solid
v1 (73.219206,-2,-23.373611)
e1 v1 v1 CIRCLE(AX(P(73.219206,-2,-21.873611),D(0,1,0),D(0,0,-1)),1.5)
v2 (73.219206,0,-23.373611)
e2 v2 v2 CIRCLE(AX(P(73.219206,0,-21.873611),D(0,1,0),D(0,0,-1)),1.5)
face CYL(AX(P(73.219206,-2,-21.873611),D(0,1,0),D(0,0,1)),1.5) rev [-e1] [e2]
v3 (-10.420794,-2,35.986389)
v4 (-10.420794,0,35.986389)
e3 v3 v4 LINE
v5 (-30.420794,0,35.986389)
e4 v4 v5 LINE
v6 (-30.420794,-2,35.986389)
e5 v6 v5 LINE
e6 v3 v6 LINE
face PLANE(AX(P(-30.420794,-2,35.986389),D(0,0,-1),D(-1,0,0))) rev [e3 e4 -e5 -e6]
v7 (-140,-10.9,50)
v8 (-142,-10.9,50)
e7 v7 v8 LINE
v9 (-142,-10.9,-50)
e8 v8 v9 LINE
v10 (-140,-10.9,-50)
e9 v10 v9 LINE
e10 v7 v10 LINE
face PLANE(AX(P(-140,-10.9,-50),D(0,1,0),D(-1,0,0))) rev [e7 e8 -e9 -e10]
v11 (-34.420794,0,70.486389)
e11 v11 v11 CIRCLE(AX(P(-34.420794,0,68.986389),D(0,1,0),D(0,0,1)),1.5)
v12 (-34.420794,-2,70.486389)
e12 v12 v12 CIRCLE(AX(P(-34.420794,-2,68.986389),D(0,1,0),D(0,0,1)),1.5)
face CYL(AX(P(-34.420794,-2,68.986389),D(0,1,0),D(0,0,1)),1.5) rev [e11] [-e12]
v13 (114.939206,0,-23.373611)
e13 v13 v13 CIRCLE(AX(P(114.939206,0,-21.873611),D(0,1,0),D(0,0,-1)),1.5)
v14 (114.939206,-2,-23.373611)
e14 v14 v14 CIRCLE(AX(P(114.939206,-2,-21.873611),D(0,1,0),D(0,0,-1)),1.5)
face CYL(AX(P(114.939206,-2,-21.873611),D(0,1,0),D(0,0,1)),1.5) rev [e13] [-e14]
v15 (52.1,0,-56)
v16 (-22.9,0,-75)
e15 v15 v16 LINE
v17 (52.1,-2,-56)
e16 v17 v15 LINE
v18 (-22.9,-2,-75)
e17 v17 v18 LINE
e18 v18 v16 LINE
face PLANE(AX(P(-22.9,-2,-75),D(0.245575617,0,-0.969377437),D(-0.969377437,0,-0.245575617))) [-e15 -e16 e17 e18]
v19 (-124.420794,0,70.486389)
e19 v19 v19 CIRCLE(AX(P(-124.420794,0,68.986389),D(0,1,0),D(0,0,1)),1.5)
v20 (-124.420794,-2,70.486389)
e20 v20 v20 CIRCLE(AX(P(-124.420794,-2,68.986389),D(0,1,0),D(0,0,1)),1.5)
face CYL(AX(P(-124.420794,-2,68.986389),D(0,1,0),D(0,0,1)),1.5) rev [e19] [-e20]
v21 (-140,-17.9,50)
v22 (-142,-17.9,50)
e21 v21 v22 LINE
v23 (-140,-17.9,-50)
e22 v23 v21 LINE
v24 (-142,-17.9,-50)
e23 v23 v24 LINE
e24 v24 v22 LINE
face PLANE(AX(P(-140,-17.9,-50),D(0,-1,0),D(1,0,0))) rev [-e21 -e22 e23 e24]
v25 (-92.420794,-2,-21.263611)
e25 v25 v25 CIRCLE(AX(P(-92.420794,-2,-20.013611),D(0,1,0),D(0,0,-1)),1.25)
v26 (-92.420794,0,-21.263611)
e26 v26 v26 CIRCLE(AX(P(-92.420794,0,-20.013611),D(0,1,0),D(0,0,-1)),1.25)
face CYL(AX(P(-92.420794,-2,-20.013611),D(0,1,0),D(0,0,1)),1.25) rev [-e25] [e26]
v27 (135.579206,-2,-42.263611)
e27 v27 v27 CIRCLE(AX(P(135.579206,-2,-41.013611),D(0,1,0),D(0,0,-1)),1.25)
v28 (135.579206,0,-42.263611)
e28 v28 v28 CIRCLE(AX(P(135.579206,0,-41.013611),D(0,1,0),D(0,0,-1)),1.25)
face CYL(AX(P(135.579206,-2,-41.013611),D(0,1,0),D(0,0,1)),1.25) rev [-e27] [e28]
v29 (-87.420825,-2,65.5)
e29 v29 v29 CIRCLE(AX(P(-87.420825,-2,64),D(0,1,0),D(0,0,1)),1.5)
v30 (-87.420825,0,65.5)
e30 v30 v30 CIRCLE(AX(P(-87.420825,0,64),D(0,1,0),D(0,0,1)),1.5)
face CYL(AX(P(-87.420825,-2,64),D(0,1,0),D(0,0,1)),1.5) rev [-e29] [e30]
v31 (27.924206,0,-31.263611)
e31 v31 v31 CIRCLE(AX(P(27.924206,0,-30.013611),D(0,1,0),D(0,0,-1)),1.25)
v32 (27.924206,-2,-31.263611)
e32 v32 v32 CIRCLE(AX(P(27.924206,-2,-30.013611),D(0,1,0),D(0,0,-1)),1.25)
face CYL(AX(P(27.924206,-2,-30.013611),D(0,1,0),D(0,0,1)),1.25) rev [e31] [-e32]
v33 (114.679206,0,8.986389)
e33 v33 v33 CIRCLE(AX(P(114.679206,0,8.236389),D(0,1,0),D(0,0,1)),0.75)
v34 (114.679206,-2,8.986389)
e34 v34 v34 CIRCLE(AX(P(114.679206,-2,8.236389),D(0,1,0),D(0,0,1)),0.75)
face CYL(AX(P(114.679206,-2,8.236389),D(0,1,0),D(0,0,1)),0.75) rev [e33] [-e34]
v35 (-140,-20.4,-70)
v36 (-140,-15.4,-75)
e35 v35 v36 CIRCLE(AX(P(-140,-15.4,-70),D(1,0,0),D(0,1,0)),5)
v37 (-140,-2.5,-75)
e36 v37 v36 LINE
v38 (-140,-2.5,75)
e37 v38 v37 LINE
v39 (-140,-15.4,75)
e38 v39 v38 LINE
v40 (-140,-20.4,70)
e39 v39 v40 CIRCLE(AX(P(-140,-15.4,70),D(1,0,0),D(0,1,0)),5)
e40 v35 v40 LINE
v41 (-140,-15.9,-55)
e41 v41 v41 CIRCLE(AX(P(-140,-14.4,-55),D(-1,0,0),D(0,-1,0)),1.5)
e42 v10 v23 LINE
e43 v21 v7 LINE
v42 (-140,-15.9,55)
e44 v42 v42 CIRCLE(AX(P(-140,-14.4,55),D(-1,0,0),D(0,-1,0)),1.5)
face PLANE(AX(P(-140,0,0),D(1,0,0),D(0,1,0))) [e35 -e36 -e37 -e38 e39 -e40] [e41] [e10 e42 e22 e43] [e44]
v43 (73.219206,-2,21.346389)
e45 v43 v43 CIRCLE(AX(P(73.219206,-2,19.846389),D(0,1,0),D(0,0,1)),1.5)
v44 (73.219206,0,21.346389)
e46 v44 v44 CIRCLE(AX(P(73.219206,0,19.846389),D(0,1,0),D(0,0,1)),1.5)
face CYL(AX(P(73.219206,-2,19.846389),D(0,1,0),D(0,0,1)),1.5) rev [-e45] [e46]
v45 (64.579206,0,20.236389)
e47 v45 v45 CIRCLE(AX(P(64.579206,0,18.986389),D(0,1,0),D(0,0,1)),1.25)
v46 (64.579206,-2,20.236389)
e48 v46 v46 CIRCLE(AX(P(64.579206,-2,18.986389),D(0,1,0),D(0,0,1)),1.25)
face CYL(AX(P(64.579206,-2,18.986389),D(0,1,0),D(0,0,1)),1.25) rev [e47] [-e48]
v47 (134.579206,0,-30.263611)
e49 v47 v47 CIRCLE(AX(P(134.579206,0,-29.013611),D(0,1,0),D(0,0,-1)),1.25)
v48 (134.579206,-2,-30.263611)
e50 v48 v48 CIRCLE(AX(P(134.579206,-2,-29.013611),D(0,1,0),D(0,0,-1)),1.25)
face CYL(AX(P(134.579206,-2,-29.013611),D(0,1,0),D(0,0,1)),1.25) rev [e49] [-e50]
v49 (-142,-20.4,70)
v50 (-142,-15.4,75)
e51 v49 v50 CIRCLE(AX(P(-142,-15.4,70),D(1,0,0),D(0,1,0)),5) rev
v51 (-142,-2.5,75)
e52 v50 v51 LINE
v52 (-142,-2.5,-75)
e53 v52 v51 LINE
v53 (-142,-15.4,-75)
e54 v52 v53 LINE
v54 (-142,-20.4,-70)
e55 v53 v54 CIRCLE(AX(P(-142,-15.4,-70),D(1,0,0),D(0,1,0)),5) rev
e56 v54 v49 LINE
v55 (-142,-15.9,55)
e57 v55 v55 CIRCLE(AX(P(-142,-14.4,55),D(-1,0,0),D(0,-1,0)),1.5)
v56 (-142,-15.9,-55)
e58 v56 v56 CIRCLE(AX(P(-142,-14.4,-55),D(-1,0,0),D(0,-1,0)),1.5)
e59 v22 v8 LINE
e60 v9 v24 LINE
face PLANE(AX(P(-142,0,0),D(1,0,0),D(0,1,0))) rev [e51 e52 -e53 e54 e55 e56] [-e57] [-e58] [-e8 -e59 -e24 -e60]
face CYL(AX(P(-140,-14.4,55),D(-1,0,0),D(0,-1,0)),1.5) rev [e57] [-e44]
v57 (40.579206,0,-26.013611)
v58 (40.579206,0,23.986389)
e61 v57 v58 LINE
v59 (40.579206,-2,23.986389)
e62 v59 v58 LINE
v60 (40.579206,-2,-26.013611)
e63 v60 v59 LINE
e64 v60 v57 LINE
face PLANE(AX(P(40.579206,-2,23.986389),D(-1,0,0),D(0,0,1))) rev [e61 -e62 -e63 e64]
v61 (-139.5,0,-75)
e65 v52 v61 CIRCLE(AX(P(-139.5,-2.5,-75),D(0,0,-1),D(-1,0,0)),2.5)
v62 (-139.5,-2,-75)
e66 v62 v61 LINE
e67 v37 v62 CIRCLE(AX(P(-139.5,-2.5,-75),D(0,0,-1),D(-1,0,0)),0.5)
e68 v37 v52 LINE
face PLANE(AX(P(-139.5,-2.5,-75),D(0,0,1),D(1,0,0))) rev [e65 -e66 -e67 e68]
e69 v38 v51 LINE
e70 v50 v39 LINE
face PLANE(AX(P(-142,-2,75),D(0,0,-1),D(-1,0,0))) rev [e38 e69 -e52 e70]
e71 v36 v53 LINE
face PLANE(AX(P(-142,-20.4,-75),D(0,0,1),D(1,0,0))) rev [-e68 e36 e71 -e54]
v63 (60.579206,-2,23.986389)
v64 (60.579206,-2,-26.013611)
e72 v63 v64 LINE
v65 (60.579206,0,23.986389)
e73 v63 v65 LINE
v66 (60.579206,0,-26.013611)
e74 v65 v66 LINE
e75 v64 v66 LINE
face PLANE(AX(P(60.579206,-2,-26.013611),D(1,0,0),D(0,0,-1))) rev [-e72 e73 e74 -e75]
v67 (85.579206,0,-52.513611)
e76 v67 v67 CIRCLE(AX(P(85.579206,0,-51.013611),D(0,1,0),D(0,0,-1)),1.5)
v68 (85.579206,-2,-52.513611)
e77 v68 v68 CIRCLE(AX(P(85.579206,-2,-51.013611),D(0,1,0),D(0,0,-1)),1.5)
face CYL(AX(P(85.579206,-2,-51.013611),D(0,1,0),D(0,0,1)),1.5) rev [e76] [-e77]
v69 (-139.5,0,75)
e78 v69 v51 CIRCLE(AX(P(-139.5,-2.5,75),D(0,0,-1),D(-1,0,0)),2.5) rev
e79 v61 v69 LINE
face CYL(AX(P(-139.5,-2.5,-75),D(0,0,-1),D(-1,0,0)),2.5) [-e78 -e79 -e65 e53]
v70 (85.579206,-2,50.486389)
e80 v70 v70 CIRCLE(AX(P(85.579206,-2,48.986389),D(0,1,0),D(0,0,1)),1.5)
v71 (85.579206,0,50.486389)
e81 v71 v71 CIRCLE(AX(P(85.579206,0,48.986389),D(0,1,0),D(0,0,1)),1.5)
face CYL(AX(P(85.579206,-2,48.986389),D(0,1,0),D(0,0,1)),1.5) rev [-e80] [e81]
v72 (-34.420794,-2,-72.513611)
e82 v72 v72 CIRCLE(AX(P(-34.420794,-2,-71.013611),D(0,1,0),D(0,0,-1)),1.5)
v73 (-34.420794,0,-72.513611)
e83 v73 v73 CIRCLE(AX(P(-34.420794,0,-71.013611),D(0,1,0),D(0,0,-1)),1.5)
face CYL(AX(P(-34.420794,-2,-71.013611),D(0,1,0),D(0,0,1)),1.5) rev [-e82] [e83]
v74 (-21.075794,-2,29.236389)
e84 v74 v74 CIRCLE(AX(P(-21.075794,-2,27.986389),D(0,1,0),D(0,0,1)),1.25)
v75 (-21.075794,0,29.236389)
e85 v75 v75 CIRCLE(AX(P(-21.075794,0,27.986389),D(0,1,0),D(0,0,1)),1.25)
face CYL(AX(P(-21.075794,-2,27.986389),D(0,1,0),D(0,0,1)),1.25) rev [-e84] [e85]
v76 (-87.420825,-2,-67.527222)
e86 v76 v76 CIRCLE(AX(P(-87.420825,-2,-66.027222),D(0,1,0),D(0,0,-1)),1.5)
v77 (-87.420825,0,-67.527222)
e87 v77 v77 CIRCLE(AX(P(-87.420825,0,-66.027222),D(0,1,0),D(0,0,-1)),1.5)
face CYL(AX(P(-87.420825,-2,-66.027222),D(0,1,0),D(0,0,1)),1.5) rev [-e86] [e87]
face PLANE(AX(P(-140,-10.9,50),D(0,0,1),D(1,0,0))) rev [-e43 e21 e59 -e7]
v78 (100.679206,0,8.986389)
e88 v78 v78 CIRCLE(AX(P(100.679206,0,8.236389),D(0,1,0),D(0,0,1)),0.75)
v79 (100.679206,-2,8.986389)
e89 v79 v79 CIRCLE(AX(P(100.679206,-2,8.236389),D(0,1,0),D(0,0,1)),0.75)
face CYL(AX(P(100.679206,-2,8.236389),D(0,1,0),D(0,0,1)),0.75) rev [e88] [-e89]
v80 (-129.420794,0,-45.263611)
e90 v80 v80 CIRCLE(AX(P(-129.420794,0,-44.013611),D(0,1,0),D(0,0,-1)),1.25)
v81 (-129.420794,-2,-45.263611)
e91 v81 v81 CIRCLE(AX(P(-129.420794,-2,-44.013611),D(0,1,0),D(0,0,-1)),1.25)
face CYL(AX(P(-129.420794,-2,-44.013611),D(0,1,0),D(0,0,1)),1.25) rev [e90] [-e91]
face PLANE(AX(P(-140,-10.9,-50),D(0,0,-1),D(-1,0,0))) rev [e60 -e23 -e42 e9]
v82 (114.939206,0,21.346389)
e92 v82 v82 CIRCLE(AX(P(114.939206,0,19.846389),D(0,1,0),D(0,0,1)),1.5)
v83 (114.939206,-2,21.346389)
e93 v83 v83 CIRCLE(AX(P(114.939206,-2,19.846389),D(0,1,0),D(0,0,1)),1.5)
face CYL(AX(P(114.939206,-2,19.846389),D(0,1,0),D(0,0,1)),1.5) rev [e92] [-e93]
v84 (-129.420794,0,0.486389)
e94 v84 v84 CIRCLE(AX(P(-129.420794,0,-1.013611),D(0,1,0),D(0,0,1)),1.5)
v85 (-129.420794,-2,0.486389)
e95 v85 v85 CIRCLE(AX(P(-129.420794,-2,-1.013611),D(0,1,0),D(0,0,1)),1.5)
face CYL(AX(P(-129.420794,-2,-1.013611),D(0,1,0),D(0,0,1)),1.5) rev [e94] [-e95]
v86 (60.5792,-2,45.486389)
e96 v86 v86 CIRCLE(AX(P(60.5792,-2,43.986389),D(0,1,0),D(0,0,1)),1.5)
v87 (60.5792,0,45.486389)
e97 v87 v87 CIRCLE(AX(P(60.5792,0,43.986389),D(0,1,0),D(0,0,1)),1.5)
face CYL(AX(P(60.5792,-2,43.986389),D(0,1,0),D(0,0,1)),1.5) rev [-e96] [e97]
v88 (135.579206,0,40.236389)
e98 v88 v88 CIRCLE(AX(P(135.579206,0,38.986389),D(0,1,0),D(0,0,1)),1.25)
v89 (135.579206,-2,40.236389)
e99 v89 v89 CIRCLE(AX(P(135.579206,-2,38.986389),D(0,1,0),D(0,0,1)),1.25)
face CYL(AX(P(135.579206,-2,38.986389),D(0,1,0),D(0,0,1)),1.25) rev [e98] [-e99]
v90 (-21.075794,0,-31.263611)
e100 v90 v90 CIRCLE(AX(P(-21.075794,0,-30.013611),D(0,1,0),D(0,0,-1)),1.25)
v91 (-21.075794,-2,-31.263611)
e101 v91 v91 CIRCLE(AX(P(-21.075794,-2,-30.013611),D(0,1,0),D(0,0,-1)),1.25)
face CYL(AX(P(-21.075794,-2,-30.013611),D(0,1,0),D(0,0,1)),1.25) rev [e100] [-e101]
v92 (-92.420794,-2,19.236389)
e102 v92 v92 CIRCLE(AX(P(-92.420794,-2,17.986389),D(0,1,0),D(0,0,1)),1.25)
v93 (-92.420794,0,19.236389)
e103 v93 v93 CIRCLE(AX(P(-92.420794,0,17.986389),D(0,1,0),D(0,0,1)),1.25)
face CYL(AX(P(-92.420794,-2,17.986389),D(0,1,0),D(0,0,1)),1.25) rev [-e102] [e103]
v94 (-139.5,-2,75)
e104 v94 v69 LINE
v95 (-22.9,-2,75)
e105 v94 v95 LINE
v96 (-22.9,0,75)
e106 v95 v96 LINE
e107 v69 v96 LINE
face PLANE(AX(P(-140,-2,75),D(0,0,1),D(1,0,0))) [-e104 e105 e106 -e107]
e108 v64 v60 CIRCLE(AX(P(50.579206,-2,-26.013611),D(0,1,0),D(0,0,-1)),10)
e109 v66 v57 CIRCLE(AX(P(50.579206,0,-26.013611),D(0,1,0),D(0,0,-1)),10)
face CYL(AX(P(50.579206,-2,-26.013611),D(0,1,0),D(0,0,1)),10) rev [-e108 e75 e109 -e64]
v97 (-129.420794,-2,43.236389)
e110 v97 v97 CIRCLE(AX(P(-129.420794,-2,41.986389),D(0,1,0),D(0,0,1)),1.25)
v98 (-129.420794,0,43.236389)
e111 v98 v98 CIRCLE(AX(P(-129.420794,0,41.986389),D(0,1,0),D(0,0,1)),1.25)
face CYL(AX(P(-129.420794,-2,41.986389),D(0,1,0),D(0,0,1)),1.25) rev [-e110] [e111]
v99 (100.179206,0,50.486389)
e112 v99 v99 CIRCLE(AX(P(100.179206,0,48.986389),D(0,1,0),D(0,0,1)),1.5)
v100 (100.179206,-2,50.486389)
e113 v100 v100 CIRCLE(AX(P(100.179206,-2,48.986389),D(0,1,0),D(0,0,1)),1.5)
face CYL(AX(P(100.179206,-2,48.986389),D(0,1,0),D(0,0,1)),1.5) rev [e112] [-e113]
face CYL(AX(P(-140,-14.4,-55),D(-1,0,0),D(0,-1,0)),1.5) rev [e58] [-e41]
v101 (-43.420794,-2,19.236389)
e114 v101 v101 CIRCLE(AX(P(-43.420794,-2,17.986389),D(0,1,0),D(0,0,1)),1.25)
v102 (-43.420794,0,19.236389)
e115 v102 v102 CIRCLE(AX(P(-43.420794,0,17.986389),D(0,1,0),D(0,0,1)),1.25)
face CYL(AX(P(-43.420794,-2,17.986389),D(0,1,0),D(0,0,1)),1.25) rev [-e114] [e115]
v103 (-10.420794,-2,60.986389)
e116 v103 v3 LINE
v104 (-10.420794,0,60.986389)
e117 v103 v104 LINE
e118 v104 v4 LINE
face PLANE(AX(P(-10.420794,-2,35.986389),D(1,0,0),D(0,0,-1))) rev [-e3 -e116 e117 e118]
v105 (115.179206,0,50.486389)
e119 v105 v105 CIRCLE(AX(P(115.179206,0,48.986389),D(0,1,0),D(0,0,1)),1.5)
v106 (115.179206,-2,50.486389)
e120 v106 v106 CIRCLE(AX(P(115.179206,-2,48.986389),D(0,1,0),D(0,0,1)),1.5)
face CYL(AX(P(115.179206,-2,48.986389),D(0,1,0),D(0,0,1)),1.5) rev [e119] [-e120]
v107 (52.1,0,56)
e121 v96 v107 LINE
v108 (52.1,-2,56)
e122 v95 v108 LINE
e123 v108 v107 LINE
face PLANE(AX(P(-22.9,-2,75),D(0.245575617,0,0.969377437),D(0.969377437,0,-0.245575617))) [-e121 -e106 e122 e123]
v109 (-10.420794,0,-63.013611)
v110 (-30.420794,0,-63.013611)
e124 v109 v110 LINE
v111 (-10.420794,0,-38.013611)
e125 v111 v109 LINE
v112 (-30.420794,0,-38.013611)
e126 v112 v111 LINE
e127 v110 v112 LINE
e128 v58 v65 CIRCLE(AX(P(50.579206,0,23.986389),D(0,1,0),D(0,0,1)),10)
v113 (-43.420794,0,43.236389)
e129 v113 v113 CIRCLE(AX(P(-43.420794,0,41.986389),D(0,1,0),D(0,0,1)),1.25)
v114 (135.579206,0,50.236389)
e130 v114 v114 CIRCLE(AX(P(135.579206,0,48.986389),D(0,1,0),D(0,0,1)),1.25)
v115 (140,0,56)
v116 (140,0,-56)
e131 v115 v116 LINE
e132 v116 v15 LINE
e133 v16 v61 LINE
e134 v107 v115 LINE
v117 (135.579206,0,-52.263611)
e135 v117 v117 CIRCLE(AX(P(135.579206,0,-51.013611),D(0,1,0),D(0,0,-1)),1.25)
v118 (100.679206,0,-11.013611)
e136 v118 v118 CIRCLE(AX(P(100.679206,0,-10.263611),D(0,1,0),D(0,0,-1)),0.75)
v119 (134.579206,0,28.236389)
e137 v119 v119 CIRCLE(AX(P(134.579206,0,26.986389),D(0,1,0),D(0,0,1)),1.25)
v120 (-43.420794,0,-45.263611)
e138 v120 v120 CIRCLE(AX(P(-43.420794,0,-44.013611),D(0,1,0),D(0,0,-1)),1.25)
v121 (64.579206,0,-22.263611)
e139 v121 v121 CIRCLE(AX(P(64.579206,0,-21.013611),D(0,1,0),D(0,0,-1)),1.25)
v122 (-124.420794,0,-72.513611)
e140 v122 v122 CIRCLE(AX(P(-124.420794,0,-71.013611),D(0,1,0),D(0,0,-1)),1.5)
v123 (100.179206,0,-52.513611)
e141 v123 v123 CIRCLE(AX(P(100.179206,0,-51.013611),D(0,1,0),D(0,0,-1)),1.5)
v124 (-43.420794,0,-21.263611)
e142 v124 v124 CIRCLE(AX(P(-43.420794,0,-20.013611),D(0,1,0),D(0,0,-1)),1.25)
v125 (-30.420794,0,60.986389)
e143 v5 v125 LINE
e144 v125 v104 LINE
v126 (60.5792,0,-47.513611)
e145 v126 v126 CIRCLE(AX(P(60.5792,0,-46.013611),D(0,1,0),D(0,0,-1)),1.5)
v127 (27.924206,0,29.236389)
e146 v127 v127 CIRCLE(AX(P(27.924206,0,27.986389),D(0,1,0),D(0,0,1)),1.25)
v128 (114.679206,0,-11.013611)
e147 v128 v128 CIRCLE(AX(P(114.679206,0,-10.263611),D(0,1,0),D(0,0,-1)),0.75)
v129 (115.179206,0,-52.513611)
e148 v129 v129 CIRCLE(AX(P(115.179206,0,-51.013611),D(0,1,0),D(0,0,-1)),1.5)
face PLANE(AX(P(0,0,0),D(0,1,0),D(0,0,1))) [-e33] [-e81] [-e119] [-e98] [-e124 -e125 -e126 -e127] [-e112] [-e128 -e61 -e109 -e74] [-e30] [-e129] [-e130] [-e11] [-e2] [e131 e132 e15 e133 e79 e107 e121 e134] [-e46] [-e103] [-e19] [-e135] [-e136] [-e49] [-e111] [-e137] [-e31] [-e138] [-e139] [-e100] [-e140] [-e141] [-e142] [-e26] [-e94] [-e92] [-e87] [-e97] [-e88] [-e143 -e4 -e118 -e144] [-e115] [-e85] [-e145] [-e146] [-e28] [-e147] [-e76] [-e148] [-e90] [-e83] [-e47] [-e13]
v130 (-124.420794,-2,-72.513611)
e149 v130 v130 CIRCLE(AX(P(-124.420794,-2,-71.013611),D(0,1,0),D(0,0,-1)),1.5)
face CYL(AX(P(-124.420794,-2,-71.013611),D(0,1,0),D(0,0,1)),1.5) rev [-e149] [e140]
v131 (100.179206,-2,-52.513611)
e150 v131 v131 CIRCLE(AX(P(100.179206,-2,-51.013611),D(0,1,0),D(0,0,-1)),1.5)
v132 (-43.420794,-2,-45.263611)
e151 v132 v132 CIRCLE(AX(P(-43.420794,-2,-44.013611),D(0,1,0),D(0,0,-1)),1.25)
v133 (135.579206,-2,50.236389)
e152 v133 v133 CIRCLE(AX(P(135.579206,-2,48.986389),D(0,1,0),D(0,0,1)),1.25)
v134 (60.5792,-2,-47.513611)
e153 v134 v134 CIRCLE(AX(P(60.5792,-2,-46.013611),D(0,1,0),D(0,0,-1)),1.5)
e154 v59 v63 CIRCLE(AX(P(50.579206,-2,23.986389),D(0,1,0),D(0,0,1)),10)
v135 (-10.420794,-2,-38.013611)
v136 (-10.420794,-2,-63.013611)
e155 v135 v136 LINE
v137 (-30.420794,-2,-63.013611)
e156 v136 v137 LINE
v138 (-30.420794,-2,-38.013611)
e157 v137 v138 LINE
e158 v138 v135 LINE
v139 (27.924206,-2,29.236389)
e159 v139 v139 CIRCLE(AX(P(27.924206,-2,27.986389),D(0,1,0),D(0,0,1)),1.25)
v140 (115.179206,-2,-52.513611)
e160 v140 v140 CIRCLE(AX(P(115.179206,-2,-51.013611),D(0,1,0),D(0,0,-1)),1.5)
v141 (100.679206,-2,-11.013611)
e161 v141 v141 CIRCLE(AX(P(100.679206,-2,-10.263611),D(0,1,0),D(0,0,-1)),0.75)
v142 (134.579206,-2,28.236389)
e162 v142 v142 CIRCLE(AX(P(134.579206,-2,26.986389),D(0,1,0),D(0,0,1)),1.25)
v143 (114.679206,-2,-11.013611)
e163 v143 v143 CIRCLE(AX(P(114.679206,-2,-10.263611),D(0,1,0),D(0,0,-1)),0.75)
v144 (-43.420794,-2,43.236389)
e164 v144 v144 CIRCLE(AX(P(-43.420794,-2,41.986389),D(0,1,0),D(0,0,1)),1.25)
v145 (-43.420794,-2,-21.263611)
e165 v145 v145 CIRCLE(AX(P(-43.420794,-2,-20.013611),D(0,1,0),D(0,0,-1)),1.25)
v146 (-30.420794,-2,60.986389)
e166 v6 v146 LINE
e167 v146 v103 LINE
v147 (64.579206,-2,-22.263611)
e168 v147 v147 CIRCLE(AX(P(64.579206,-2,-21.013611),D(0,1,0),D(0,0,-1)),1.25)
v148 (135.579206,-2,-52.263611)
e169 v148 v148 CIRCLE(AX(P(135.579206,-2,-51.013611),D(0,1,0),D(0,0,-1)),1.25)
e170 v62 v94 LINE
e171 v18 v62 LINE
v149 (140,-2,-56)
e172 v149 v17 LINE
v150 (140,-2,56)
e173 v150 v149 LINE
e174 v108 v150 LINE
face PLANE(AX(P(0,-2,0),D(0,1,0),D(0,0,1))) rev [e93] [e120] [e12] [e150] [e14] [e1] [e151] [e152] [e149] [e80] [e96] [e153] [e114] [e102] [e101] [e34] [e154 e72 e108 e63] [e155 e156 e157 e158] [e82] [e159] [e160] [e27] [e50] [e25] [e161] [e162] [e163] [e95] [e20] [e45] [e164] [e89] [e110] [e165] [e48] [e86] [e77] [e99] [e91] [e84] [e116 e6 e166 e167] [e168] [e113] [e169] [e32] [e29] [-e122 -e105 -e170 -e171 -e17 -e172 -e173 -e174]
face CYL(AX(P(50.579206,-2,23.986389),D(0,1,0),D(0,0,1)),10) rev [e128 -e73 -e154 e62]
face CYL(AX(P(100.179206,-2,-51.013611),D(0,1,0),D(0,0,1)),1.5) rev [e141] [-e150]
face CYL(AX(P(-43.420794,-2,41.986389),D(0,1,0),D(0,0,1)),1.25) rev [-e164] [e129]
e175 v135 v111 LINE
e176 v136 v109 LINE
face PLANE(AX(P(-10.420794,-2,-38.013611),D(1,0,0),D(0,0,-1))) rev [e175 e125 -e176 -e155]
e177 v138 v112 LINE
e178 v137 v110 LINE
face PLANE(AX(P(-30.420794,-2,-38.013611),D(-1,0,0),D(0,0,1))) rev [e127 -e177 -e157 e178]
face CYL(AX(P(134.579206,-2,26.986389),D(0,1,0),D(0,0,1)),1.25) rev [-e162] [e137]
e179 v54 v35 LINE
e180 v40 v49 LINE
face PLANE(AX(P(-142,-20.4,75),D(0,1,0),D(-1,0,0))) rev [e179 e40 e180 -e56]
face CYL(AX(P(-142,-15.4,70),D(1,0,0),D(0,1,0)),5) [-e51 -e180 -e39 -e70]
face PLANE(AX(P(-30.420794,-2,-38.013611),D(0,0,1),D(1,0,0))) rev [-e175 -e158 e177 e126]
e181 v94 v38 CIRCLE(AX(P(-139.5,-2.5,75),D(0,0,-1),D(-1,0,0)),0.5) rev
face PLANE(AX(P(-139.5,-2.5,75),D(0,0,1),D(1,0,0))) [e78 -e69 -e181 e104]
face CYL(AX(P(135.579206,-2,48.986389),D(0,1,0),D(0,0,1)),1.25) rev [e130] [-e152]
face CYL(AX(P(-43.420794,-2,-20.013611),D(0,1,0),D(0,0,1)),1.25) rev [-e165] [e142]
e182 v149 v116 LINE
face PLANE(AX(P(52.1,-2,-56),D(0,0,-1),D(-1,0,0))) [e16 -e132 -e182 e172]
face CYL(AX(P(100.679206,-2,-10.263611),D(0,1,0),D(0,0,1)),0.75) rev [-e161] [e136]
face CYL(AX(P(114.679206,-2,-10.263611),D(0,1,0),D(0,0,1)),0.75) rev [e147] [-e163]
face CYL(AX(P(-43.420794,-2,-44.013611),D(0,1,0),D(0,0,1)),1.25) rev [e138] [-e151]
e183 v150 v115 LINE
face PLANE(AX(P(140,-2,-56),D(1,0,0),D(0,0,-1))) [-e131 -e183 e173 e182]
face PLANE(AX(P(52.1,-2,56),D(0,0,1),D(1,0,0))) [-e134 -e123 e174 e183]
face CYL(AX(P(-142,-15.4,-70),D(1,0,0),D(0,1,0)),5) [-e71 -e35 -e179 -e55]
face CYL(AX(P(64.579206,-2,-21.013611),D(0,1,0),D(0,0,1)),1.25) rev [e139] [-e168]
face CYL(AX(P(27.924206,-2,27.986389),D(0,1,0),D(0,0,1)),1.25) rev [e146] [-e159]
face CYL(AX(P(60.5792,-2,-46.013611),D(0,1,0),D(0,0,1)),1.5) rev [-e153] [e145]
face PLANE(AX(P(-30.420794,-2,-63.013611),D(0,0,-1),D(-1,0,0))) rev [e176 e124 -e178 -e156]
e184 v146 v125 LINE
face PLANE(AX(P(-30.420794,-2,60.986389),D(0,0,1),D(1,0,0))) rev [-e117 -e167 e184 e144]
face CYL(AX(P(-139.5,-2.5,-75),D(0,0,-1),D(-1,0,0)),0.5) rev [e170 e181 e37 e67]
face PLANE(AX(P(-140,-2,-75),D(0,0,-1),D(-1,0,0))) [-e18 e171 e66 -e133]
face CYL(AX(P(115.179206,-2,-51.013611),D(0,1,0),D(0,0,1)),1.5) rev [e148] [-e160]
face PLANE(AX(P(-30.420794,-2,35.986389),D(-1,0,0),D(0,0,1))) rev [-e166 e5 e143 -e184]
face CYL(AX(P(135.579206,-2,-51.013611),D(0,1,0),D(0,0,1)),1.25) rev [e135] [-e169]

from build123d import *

# Parameters (mm, degrees)
BRIDA_BASE1_DEPTH                = 2
CROQUIS9_R                       = 1.5
CROQUIS9_R_2                     = 1.25
CROQUIS9_R_3                     = 0.75
CROQUIS9_W                       = 20
CROQUIS9_H                       = 25
CORTAR_EXTRUIR2_DEPTH            = 159.836393815
BRIDA_DE_ARISTA1_STRIP_W         = 9
BRIDA_DE_ARISTA1_STRIP_H         = 2
BRIDA_DE_ARISTA1_STRIP_CUT_DEPTH = 150
BRIDA_DE_ARISTA1_DEPTH           = 150
CROQUIS13_R                      = 1.5
CROQUIS13_W                      = 100
CROQUIS13_H                      = 7
CORTAR_EXTRUIR3_DEPTH            = 10
REDONDEO2_R                      = 5


# Sheet-metal steps are written as plain solids
with BuildPart() as part:
    # Croquis base → Brida base1 (new body)
    with BuildSketch(Plane(origin=(0, 0, 0), x_dir=(1, 0, 0), z_dir=(0, 1, 0))):
        Polygon((-140, 75), (-22.9, 75), (52.1, 56), (140, 56), (140, -56), (52.1, -56), (-22.9, -75), (-140, -75), align=None)
    extrude(amount=-BRIDA_BASE1_DEPTH)

    # Croquis9 → Cortar-Extruir2 (cut, through all)
    with BuildSketch(Plane(origin=(0, 0, 0), x_dir=(1, 0, 0), z_dir=(0, 1, 0))):
        with Locations(Location((85.579206262, -48.986389042, 0), (0, 0, 270))):
            Circle(CROQUIS9_R)
        with Locations(Location((100.179206262, -48.986389042, 0), (0, 0, 270))):
            Circle(CROQUIS9_R)
        with Locations(Location((115.179206262, -48.986389042, 0), (0, 0, 270))):
            Circle(CROQUIS9_R)
        with Locations(Location((135.579206262, -48.986389042, 0), (0, 0, 270))):
            Circle(CROQUIS9_R_2)
        with Locations(Location((-124.420793738, -68.986389042, 0), (0, 0, 270))):
            Circle(CROQUIS9_R)
        with Locations(Location((-34.420793738, -68.986389042, 0), (0, 0, 270))):
            Circle(CROQUIS9_R)
        with Locations(Location((-87.420825, -64, 0), (0, 0, 270))):
            Circle(CROQUIS9_R)
        with Locations(Location((-129.420793738, -41.986389042, 0), (0, 0, 270))):
            Circle(CROQUIS9_R_2)
        with Locations(Location((-43.420793738, -41.986389042, 0), (0, 0, 270))):
            Circle(CROQUIS9_R_2)
        with Locations(Location((60.5792, -43.986389042, 0), (0, 0, 270))):
            Circle(CROQUIS9_R)
        with Locations(Location((135.579206262, -38.986389042, 0), (0, 0, 270))):
            Circle(CROQUIS9_R_2)
        with Locations(Location((134.579206262, -26.986389042, 0), (0, 0, 270))):
            Circle(CROQUIS9_R_2)
        with Locations(Location((-92.420793738, -17.986389042, 0), (0, 0, 270))):
            Circle(CROQUIS9_R_2)
        with Locations(Location((-43.420793738, -17.986389042, 0), (0, 0, 270))):
            Circle(CROQUIS9_R_2)
        with Locations(Location((-21.075793738, -27.986389042, 0), (0, 0, 270))):
            Circle(CROQUIS9_R_2)
        with Locations(Location((27.924206262, -27.986389042, 0), (0, 0, 270))):
            Circle(CROQUIS9_R_2)
        with Locations(Location((64.579206262, -18.986389042, 0), (0, 0, 270))):
            Circle(CROQUIS9_R_2)
        with Locations(Location((114.939206262, -19.846389042, 0), (0, 0, 270))):
            Circle(CROQUIS9_R)
        with Locations(Location((73.219206262, -19.846389042, 0), (0, 0, 270))):
            Circle(CROQUIS9_R)
        with Locations(Location((100.679206262, -8.236389042, 0), (0, 0, 270))):
            Circle(CROQUIS9_R_3)
        with Locations(Location((114.679206262, -8.236389042, 0), (0, 0, 270))):
            Circle(CROQUIS9_R_3)
        with Locations(Location((-124.420793738, 71.013610958, 0), (0, 0, 90))):
            Circle(CROQUIS9_R)
        with Locations(Location((-129.420793738, 44.013610958, 0), (0, 0, 90))):
            Circle(CROQUIS9_R_2)
        with Locations(Location((-87.420825, 66.027221915, 0), (0, 0, 90))):
            Circle(CROQUIS9_R)
        with Locations(Location((-92.420793738, 20.013610958, 0), (0, 0, 90))):
            Circle(CROQUIS9_R_2)
        with Locations(Location((-43.420793738, 20.013610958, 0), (0, 0, 90))):
            Circle(CROQUIS9_R_2)
        with Locations(Location((-43.420793738, 44.013610958, 0), (0, 0, 90))):
            Circle(CROQUIS9_R_2)
        with Locations(Location((-34.420793738, 71.013610958, 0), (0, 0, 90))):
            Circle(CROQUIS9_R)
        with Locations(Location((-21.075793738, 30.013610958, 0), (0, 0, 90))):
            Circle(CROQUIS9_R_2)
        with Locations(Location((115.179206262, 51.013610958, 0), (0, 0, 90))):
            Circle(CROQUIS9_R)
        with Locations(Location((27.924206262, 30.013610958, 0), (0, 0, 90))):
            Circle(CROQUIS9_R_2)
        with Locations(Location((64.579206262, 21.013610958, 0), (0, 0, 90))):
            Circle(CROQUIS9_R_2)
        with Locations(Location((73.219206262, 21.873610958, 0), (0, 0, 90))):
            Circle(CROQUIS9_R)
        with Locations(Location((60.5792, 46.013610958, 0), (0, 0, 90))):
            Circle(CROQUIS9_R)
        with Locations(Location((85.579206262, 51.013610958, 0), (0, 0, 90))):
            Circle(CROQUIS9_R)
        with Locations(Location((100.179206262, 51.013610958, 0), (0, 0, 90))):
            Circle(CROQUIS9_R)
        with Locations(Location((100.679206262, 10.263610958, 0), (0, 0, 90))):
            Circle(CROQUIS9_R_3)
        with Locations(Location((114.679206262, 10.263610958, 0), (0, 0, 90))):
            Circle(CROQUIS9_R_3)
        with Locations(Location((114.939206262, 21.873610958, 0), (0, 0, 90))):
            Circle(CROQUIS9_R)
        with Locations(Location((134.579206262, 29.013610958, 0), (0, 0, 90))):
            Circle(CROQUIS9_R_2)
        with Locations(Location((135.579206262, 41.013610958, 0), (0, 0, 90))):
            Circle(CROQUIS9_R_2)
        with Locations(Location((135.579206262, 51.013610958, 0), (0, 0, 90))):
            Circle(CROQUIS9_R_2)
        with Locations(Location((-129.420793738, 1.013610958, 0), (0, 0, 270))):
            Circle(CROQUIS9_R)
        with Locations((-20.420793738, -48.486389042)):
            Rectangle(CROQUIS9_W, CROQUIS9_H)
        with BuildLine():
            Line((60.579206262, 26.013610958), (60.579206262, -23.986389042))
            ThreePointArc((60.579206262, -23.986389042), (50.579206262, -33.986389042), (40.579206262, -23.986389042))
            Line((40.579206262, -23.986389042), (40.579206262, 26.013610958))
            ThreePointArc((40.579206262, 26.013610958), (50.579206262, 36.013610958), (60.579206262, 26.013610958))
        make_face()
        with Locations((-20.420793738, 50.513610958)):
            Rectangle(CROQUIS9_W, CROQUIS9_H)
    extrude(amount=-CORTAR_EXTRUIR2_DEPTH, mode=Mode.SUBTRACT)

    # Brida de arista1 strip (across the edge) → Brida de arista1 strip cut (cut)
    with BuildSketch(Plane(origin=(-140, -2, 75), x_dir=(1, 0, 0), z_dir=(0, 0, -1))):
        with Locations((-4, -1)):
            Rectangle(BRIDA_DE_ARISTA1_STRIP_W, BRIDA_DE_ARISTA1_STRIP_H)
    extrude(amount=BRIDA_DE_ARISTA1_STRIP_CUT_DEPTH, mode=Mode.SUBTRACT)

    # Brida de arista1 section (across the edge) → Brida de arista1 (add)
    with BuildSketch(Plane(origin=(-140, -2, 75), x_dir=(1, 0, 0), z_dir=(0, 0, -1))):
        with BuildLine():
            Line((-2, 0.5), (-2, 18.4))
            Line((-2, 18.4), (0, 18.4))
            Line((0, 18.4), (0, 0.5))
            ThreePointArc((0, 0.5), (0.146446609, 0.146446609), (0.5, 0))
            Line((0.5, 0), (0.5, -2))
            ThreePointArc((0.5, -2), (-1.267766953, -1.267766953), (-2, 0.5))
        make_face()
    extrude(amount=BRIDA_DE_ARISTA1_DEPTH)

    # Croquis13 → Cortar-Extruir3 (cut)
    with BuildSketch(Plane.ZY.offset(142)):
        with Locations(Location((55, -14.4, 0), (0, 0, 270))):
            Circle(CROQUIS13_R)
        with Locations(Location((-55, -14.4, 0), (0, 0, 270))):
            Circle(CROQUIS13_R)
        with Locations((0, -14.4)):
            Rectangle(CROQUIS13_W, CROQUIS13_H)
    extrude(amount=-CORTAR_EXTRUIR3_DEPTH, mode=Mode.SUBTRACT)

    # Redondeo2
    redondeo2_edges = [part.edges().sort_by_distance(p)[0] for p in [
        (-141, -20.4, 75),
        (-141, -20.4, -75),
    ]]
    fillet(redondeo2_edges, radius=REDONDEO2_R)


solid = part.part
